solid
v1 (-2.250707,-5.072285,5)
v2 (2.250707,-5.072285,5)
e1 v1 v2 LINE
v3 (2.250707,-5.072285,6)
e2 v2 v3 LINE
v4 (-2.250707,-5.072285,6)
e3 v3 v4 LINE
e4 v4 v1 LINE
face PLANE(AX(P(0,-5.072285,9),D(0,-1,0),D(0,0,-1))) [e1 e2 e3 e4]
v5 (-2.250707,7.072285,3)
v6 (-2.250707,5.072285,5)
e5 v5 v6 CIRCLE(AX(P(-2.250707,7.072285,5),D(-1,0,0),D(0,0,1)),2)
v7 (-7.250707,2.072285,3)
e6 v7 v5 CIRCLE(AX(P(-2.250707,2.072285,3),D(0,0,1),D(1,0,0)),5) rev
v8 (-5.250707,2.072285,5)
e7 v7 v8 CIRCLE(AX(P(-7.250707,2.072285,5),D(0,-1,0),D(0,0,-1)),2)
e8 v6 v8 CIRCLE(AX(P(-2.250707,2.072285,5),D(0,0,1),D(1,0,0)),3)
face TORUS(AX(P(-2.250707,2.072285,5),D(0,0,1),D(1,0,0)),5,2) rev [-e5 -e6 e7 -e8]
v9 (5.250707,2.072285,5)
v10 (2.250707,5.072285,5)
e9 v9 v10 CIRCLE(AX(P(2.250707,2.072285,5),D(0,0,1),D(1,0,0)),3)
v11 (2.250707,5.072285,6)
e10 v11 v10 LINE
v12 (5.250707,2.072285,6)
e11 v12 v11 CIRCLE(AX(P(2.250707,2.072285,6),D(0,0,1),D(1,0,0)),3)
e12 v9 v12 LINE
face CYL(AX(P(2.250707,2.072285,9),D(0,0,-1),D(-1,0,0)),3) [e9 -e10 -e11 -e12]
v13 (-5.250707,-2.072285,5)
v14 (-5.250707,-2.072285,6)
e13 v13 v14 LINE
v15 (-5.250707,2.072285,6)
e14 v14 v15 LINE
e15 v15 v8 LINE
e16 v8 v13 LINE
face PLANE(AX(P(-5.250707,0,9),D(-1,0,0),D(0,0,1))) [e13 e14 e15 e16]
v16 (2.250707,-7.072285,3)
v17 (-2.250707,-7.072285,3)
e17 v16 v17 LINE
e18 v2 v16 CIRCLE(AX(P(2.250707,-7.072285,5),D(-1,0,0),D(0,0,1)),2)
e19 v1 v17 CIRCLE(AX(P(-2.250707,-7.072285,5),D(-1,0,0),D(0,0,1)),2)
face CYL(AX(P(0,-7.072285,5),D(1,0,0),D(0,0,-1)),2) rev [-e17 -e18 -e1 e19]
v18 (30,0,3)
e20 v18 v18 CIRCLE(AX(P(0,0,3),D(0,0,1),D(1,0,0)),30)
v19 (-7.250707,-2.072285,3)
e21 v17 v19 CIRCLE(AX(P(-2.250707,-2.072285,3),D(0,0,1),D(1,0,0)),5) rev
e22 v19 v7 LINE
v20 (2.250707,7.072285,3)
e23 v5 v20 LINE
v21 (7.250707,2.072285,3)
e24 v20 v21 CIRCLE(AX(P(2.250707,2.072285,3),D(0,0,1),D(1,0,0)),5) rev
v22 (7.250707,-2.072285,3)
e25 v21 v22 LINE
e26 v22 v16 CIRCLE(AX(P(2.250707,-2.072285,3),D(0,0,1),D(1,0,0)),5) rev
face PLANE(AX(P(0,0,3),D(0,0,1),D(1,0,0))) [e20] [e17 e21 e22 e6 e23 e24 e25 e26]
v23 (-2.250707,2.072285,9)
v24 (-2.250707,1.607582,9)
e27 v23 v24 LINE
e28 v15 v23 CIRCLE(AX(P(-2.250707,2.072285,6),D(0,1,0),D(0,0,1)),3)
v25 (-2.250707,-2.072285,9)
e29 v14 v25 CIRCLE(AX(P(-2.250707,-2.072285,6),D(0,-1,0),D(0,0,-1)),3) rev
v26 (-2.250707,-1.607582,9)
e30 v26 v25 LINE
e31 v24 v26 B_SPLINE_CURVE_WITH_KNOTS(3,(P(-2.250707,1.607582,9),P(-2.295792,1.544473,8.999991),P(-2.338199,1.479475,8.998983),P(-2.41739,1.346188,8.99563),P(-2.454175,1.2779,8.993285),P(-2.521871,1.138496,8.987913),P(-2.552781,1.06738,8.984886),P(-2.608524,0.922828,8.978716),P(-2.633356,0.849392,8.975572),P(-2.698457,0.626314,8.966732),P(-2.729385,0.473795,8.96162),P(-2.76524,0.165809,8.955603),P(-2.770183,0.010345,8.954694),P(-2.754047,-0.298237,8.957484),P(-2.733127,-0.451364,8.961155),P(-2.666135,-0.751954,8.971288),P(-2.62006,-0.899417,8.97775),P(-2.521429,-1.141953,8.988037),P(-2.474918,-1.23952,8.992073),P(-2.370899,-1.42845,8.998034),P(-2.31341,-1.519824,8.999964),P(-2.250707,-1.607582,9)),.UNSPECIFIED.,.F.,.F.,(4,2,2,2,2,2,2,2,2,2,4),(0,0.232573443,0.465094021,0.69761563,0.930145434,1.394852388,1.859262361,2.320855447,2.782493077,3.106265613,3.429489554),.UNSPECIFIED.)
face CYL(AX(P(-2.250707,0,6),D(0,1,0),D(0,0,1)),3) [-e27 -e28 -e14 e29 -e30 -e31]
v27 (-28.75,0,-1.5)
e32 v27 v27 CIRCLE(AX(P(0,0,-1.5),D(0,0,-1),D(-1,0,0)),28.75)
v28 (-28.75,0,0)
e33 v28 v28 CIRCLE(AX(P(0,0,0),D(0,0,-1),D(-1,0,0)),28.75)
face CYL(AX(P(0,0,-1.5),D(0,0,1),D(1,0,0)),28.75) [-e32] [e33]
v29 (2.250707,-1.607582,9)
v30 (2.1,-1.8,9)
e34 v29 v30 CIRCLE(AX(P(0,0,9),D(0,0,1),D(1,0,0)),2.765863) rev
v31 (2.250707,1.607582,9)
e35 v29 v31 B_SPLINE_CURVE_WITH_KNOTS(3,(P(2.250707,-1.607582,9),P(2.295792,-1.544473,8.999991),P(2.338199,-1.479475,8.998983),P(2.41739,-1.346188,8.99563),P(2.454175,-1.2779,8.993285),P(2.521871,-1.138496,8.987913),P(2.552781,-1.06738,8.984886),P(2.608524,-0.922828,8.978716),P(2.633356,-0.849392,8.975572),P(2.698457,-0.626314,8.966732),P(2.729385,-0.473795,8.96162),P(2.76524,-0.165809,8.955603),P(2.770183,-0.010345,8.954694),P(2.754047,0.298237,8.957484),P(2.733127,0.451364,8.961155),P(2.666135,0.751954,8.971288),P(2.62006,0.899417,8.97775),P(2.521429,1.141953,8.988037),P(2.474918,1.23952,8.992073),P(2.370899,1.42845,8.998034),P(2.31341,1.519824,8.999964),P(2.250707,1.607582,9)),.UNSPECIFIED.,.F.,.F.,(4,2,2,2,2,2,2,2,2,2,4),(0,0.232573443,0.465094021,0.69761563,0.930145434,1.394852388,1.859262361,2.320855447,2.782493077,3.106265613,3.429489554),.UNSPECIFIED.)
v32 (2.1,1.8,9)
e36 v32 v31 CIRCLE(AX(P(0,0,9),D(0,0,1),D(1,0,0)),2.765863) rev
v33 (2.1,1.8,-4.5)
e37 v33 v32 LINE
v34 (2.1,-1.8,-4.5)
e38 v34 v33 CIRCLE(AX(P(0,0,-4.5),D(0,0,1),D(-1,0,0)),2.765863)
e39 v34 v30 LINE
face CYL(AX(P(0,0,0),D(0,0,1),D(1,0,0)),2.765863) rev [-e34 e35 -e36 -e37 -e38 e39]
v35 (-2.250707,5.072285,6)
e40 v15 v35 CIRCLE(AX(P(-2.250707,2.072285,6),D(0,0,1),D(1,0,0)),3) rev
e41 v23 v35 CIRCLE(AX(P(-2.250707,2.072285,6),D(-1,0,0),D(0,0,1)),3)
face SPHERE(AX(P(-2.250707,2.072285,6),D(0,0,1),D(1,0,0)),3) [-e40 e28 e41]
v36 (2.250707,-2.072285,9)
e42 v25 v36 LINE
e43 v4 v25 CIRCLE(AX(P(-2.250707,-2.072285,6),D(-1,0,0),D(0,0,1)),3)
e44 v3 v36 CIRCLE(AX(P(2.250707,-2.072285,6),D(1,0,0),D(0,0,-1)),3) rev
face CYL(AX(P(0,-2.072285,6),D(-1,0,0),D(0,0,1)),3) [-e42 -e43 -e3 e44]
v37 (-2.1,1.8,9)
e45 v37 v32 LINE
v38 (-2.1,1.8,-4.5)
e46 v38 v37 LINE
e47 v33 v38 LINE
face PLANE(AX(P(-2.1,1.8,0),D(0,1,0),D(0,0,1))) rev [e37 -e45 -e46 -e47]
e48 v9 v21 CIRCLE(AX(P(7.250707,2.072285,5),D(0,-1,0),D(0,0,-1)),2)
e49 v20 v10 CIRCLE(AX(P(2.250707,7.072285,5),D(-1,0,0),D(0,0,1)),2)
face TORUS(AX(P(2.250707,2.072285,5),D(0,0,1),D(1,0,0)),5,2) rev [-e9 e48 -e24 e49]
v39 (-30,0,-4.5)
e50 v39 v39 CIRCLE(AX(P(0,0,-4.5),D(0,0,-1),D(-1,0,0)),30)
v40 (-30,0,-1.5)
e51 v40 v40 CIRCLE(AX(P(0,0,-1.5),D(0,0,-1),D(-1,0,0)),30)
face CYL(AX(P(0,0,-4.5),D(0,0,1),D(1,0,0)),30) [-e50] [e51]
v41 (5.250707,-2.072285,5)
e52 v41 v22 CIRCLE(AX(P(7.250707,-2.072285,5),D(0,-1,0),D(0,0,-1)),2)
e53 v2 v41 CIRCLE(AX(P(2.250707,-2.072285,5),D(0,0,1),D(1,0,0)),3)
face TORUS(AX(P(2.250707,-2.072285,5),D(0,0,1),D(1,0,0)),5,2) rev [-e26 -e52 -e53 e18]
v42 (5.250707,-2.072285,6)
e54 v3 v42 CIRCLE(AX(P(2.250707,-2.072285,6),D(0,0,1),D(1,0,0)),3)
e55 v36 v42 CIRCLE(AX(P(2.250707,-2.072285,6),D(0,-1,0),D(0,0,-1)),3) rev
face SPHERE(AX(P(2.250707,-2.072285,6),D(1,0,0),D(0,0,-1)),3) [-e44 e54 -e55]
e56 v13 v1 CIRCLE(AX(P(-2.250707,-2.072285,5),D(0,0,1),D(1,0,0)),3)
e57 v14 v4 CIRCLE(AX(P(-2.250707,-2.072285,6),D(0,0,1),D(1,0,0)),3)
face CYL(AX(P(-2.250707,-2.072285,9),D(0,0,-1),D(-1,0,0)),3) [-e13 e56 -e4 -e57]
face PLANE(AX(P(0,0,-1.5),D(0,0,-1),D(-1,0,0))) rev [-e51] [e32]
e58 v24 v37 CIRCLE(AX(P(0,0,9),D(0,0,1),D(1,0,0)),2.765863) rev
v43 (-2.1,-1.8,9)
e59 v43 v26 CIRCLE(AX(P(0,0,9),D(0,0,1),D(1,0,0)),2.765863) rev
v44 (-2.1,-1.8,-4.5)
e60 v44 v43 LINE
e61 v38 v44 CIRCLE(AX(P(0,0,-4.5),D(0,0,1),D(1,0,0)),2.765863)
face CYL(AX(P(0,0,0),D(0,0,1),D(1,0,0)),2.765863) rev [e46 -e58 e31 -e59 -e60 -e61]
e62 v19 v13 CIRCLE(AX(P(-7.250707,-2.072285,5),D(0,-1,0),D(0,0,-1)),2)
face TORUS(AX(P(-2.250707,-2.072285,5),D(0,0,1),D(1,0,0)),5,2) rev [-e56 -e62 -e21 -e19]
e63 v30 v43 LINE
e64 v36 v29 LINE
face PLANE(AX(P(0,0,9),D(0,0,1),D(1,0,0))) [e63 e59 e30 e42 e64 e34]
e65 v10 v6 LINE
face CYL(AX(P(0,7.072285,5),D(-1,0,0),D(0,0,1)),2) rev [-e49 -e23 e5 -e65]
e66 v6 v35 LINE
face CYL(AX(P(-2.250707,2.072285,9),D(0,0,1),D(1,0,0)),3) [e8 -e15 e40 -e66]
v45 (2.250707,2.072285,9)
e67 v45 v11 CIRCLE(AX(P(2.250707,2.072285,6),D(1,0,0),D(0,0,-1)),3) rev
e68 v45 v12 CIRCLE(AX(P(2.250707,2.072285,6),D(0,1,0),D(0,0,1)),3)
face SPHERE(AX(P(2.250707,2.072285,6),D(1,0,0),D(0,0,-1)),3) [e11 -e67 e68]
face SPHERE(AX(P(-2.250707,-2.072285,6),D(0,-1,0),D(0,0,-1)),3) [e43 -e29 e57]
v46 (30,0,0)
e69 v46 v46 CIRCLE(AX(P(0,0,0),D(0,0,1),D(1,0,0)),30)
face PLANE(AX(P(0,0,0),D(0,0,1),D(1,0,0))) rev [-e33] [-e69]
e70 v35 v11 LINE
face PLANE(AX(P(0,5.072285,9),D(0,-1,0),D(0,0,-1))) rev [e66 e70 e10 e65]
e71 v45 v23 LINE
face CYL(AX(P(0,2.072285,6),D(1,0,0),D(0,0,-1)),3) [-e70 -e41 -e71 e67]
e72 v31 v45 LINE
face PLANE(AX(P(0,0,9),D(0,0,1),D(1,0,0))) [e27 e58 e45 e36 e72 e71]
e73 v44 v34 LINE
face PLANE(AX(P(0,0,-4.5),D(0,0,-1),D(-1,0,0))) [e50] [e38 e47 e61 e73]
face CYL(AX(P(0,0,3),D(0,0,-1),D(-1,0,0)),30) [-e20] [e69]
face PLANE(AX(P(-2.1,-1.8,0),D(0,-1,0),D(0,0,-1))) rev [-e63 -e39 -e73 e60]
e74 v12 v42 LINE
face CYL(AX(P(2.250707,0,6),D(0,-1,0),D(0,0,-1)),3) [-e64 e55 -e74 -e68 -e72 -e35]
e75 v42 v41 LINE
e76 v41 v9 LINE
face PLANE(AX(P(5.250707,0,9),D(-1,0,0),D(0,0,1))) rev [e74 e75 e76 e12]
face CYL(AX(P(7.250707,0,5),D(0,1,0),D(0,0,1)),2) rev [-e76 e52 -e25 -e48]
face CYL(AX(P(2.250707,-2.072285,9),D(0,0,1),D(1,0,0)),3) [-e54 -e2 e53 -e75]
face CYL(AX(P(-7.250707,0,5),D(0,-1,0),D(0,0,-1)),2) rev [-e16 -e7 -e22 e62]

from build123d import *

# Parameters (mm, degrees)
ESQUISSE2_R             = 30
BOSS_EXTRU_1_DEPTH      = 3
ENL_V_MAT_EXTRU_1_DEPTH = 43.532340636
BOSS_EXTRU_3_START      = 6
ESQUISSE5_W             = 10.501413836
ESQUISSE5_H             = 10.144569676
BOSS_EXTRU_3_DEPTH      = 6
ESQUISSE8_R             = 28.75
BOSS_EXTRU_4_DEPTH      = 1.5
BOSS_EXTRU_5_START      = 3
ESQUISSE9_R             = 30
BOSS_EXTRU_5_DEPTH      = 3
ENL_V_MAT_EXTRU_4_DEPTH = 44.370496884
CONG_1_R                = 3
CONG_2_R                = 2


with BuildPart() as part:
    # Esquisse2 → Boss.-Extru.1 (new body)
    with BuildSketch(Plane.XY):
        Circle(ESQUISSE2_R)
    extrude(amount=BOSS_EXTRU_1_DEPTH)

    # Esquisse4 → Enlèv. mat.-Extru.1 (cut, through all)
    with BuildSketch(Plane.XY.offset(3)):
        with BuildLine():
            Line((-2.1, -1.8), (2.1, -1.8))
            ThreePointArc((2.1, -1.8), (2.765863337, 0), (2.1, 1.8))
            Line((2.1, 1.8), (-2.1, 1.8))
            ThreePointArc((-2.1, 1.8), (-2.765863337, 0), (-2.1, -1.8))
        make_face()
    extrude(amount=-ENL_V_MAT_EXTRU_1_DEPTH, mode=Mode.SUBTRACT)

    # Esquisse5 → Boss.-Extru.3 (add)
    with BuildSketch(Plane.XY.offset(3).offset(BOSS_EXTRU_3_START)):
        Rectangle(ESQUISSE5_W, ESQUISSE5_H)
        with BuildLine():
            Line((-2.1, 1.8), (2.1, 1.8))
            ThreePointArc((2.1, 1.8), (2.765863337, 0), (2.1, -1.8))
            Line((2.1, -1.8), (-2.1, -1.8))
            ThreePointArc((-2.1, -1.8), (-2.765863337, 0), (-2.1, 1.8))
        make_face(mode=Mode.SUBTRACT)
    extrude(amount=-BOSS_EXTRU_3_DEPTH)

    # Esquisse8 → Boss.-Extru.4 (add)
    with BuildSketch(Plane(origin=(0, 0, 0), x_dir=(-1, 0, 0), z_dir=(0, 0, -1))):
        Circle(ESQUISSE8_R)
    extrude(amount=BOSS_EXTRU_4_DEPTH)

    # Esquisse9 → Boss.-Extru.5 (add)
    with BuildSketch(Plane(origin=(0, 0, -1.5), x_dir=(-1, 0, 0), z_dir=(0, 0, -1)).offset(BOSS_EXTRU_5_START)):
        with Locations(Location((0, 0, 0), (0, 0, 180))):
            Circle(ESQUISSE9_R)
    extrude(amount=-BOSS_EXTRU_5_DEPTH)

    # Esquisse10 → Enlèv. mat.-Extru.4 (cut, through all)
    with BuildSketch(Plane.XY):
        with BuildLine():
            Line((-2.1, 1.8), (2.1, 1.8))
            ThreePointArc((2.1, 1.8), (2.765863337, 0), (2.1, -1.8))
            Line((2.1, -1.8), (-2.1, -1.8))
            ThreePointArc((-2.1, -1.8), (-2.765863337, 0), (-2.1, 1.8))
        make_face()
    extrude(amount=-ENL_V_MAT_EXTRU_4_DEPTH, mode=Mode.SUBTRACT)

    # Congé1
    # the kernel refuses this fillet: 3 mm, written as the material it takes off along each edge
    with BuildSketch(Plane(origin=(-2.250706918, -2.072284838, 6), x_dir=(-1, 0, 0), z_dir=(0, -1, 0))) as cong_1_piece_1_section:
        Polygon((0, 0), (CONG_1_R, 0), (CONG_1_R, -CONG_1_R), (0, -CONG_1_R), align=None)
    cong_1_piece_1 = extrude(amount=CONG_1_R, mode=Mode.PRIVATE)
    cong_1_piece_1 = cong_1_piece_1 - Plane(origin=(-2.250706918, -2.072284838, 6), x_dir=(0.7071067811865475, 0, -0.7071067811865475), z_dir=(0, -1, 0)) * Sphere(CONG_1_R, mode=Mode.PRIVATE)
    add(cong_1_piece_1, mode=Mode.SUBTRACT)
    with BuildSketch(Plane(origin=(-2.250706918, 2.072284838, 6), x_dir=(-1, 0, 0), z_dir=(0, 1, 0))) as cong_1_piece_2_section:
        Polygon((0, 0), (CONG_1_R, 0), (CONG_1_R, CONG_1_R), (0, CONG_1_R), align=None)
    cong_1_piece_2 = extrude(amount=CONG_1_R, mode=Mode.PRIVATE)
    cong_1_piece_2 = cong_1_piece_2 - Plane(origin=(-2.250706918, 2.072284838, 6), x_dir=(0.7071067811865475, 0, -0.7071067811865475), z_dir=(0, 1, 0)) * Sphere(CONG_1_R, mode=Mode.PRIVATE)
    add(cong_1_piece_2, mode=Mode.SUBTRACT)
    with BuildSketch(Plane(origin=(2.250706918, -2.072284838, 6), x_dir=(0, -1, 0), z_dir=(1, 0, 0))) as cong_1_piece_3_section:
        Polygon((0, 0), (CONG_1_R, 0), (CONG_1_R, -CONG_1_R), (0, -CONG_1_R), align=None)
    cong_1_piece_3 = extrude(amount=CONG_1_R, mode=Mode.PRIVATE)
    cong_1_piece_3 = cong_1_piece_3 - Plane(origin=(2.250706918, -2.072284838, 6), x_dir=(0, 0.7071067811865475, -0.7071067811865475), z_dir=(1, 0, 0)) * Sphere(CONG_1_R, mode=Mode.PRIVATE)
    add(cong_1_piece_3, mode=Mode.SUBTRACT)
    with BuildSketch(Plane(origin=(2.250706918, 2.072284838, 6), x_dir=(1, 0, 0), z_dir=(0, 1, 0))) as cong_1_piece_4_section:
        Polygon((0, 0), (CONG_1_R, 0), (CONG_1_R, -CONG_1_R), (0, -CONG_1_R), align=None)
    cong_1_piece_4 = extrude(amount=CONG_1_R, mode=Mode.PRIVATE)
    cong_1_piece_4 = cong_1_piece_4 - Plane(origin=(2.250706918, 2.072284838, 6), x_dir=(-0.7071067811865475, 0, -0.7071067811865475), z_dir=(0, 1, 0)) * Sphere(CONG_1_R, mode=Mode.PRIVATE)
    add(cong_1_piece_4, mode=Mode.SUBTRACT)
    with BuildSketch(Plane(origin=(-5.250706918, -2.072284838, 9), x_dir=(0, 0, -1), z_dir=(0, 1, 0))) as cong_1_piece_5:
        with BuildLine():
            CenterArc((CONG_1_R, -CONG_1_R), CONG_1_R, 90, 90)
            Line((0, -CONG_1_R), (0, 0))
            Line((0, 0), (CONG_1_R, 0))
        make_face()
    extrude(amount=4.144569676, mode=Mode.SUBTRACT)
    with BuildSketch(Plane(origin=(-5.250706918, 5.072284838, 6), x_dir=(0, -1, 0), z_dir=(0, 0, -1)), Plane(origin=(5.250706918, -5.072284838, 6), x_dir=(0, 1, 0), z_dir=(0, 0, -1)), Plane(origin=(5.250706918, 5.072284838, 6), x_dir=(-1, 0, 0), z_dir=(0, 0, -1))) as cong_1_piece_6:
        with BuildLine():
            CenterArc((CONG_1_R, -CONG_1_R), CONG_1_R, 90, 90)
            Line((0, -CONG_1_R), (0, 0))
            Line((0, 0), (CONG_1_R, 0))
        make_face()
    extrude(amount=3, mode=Mode.SUBTRACT)
    with BuildSketch(Plane(origin=(2.250706918, -5.072284838, 9), x_dir=(0, 1, 0), z_dir=(-1, 0, 0)), Plane(origin=(-2.250706918, 5.072284838, 9), x_dir=(0, -1, 0), z_dir=(1, 0, 0))) as cong_1_piece_7:
        with BuildLine():
            CenterArc((CONG_1_R, CONG_1_R), CONG_1_R, 180, 90)
            Line((0, CONG_1_R), (0, 0))
            Line((0, 0), (CONG_1_R, 0))
        make_face()
    extrude(amount=4.501413836, mode=Mode.SUBTRACT)
    with BuildSketch(Plane(origin=(-5.250706918, -5.072284838, 6), x_dir=(0, 1, 0), z_dir=(0, 0, -1))) as cong_1_piece_8:
        with BuildLine():
            CenterArc((CONG_1_R, CONG_1_R), CONG_1_R, 180, 90)
            Line((0, CONG_1_R), (0, 0))
            Line((0, 0), (CONG_1_R, 0))
        make_face()
    extrude(amount=3, mode=Mode.SUBTRACT)
    with BuildSketch(Plane(origin=(5.250706918, 2.072284838, 9), x_dir=(-1, 0, 0), z_dir=(0, -1, 0))) as cong_1_piece_9:
        with BuildLine():
            CenterArc((CONG_1_R, CONG_1_R), CONG_1_R, 180, 90)
            Line((0, CONG_1_R), (0, 0))
            Line((0, 0), (CONG_1_R, 0))
        make_face()
    extrude(amount=4.144569676, mode=Mode.SUBTRACT)

    # Congé2
    cong_2_edges = [part.edges().sort_by_distance(p)[0] for p in [
        (-5.250706918, 0, 3),
        (0, 5.072284838, 3),
        (0, -5.072284838, 3),
        (5.250706918, 0, 3),
        (-4.372027261, 4.193605182, 3),
        (-4.372027261, -4.193605182, 3),
        (4.372027261, -4.193605182, 3),
        (4.372027261, 4.193605182, 3),
    ]]
    fillet(cong_2_edges, radius=CONG_2_R)


solid = part.part
